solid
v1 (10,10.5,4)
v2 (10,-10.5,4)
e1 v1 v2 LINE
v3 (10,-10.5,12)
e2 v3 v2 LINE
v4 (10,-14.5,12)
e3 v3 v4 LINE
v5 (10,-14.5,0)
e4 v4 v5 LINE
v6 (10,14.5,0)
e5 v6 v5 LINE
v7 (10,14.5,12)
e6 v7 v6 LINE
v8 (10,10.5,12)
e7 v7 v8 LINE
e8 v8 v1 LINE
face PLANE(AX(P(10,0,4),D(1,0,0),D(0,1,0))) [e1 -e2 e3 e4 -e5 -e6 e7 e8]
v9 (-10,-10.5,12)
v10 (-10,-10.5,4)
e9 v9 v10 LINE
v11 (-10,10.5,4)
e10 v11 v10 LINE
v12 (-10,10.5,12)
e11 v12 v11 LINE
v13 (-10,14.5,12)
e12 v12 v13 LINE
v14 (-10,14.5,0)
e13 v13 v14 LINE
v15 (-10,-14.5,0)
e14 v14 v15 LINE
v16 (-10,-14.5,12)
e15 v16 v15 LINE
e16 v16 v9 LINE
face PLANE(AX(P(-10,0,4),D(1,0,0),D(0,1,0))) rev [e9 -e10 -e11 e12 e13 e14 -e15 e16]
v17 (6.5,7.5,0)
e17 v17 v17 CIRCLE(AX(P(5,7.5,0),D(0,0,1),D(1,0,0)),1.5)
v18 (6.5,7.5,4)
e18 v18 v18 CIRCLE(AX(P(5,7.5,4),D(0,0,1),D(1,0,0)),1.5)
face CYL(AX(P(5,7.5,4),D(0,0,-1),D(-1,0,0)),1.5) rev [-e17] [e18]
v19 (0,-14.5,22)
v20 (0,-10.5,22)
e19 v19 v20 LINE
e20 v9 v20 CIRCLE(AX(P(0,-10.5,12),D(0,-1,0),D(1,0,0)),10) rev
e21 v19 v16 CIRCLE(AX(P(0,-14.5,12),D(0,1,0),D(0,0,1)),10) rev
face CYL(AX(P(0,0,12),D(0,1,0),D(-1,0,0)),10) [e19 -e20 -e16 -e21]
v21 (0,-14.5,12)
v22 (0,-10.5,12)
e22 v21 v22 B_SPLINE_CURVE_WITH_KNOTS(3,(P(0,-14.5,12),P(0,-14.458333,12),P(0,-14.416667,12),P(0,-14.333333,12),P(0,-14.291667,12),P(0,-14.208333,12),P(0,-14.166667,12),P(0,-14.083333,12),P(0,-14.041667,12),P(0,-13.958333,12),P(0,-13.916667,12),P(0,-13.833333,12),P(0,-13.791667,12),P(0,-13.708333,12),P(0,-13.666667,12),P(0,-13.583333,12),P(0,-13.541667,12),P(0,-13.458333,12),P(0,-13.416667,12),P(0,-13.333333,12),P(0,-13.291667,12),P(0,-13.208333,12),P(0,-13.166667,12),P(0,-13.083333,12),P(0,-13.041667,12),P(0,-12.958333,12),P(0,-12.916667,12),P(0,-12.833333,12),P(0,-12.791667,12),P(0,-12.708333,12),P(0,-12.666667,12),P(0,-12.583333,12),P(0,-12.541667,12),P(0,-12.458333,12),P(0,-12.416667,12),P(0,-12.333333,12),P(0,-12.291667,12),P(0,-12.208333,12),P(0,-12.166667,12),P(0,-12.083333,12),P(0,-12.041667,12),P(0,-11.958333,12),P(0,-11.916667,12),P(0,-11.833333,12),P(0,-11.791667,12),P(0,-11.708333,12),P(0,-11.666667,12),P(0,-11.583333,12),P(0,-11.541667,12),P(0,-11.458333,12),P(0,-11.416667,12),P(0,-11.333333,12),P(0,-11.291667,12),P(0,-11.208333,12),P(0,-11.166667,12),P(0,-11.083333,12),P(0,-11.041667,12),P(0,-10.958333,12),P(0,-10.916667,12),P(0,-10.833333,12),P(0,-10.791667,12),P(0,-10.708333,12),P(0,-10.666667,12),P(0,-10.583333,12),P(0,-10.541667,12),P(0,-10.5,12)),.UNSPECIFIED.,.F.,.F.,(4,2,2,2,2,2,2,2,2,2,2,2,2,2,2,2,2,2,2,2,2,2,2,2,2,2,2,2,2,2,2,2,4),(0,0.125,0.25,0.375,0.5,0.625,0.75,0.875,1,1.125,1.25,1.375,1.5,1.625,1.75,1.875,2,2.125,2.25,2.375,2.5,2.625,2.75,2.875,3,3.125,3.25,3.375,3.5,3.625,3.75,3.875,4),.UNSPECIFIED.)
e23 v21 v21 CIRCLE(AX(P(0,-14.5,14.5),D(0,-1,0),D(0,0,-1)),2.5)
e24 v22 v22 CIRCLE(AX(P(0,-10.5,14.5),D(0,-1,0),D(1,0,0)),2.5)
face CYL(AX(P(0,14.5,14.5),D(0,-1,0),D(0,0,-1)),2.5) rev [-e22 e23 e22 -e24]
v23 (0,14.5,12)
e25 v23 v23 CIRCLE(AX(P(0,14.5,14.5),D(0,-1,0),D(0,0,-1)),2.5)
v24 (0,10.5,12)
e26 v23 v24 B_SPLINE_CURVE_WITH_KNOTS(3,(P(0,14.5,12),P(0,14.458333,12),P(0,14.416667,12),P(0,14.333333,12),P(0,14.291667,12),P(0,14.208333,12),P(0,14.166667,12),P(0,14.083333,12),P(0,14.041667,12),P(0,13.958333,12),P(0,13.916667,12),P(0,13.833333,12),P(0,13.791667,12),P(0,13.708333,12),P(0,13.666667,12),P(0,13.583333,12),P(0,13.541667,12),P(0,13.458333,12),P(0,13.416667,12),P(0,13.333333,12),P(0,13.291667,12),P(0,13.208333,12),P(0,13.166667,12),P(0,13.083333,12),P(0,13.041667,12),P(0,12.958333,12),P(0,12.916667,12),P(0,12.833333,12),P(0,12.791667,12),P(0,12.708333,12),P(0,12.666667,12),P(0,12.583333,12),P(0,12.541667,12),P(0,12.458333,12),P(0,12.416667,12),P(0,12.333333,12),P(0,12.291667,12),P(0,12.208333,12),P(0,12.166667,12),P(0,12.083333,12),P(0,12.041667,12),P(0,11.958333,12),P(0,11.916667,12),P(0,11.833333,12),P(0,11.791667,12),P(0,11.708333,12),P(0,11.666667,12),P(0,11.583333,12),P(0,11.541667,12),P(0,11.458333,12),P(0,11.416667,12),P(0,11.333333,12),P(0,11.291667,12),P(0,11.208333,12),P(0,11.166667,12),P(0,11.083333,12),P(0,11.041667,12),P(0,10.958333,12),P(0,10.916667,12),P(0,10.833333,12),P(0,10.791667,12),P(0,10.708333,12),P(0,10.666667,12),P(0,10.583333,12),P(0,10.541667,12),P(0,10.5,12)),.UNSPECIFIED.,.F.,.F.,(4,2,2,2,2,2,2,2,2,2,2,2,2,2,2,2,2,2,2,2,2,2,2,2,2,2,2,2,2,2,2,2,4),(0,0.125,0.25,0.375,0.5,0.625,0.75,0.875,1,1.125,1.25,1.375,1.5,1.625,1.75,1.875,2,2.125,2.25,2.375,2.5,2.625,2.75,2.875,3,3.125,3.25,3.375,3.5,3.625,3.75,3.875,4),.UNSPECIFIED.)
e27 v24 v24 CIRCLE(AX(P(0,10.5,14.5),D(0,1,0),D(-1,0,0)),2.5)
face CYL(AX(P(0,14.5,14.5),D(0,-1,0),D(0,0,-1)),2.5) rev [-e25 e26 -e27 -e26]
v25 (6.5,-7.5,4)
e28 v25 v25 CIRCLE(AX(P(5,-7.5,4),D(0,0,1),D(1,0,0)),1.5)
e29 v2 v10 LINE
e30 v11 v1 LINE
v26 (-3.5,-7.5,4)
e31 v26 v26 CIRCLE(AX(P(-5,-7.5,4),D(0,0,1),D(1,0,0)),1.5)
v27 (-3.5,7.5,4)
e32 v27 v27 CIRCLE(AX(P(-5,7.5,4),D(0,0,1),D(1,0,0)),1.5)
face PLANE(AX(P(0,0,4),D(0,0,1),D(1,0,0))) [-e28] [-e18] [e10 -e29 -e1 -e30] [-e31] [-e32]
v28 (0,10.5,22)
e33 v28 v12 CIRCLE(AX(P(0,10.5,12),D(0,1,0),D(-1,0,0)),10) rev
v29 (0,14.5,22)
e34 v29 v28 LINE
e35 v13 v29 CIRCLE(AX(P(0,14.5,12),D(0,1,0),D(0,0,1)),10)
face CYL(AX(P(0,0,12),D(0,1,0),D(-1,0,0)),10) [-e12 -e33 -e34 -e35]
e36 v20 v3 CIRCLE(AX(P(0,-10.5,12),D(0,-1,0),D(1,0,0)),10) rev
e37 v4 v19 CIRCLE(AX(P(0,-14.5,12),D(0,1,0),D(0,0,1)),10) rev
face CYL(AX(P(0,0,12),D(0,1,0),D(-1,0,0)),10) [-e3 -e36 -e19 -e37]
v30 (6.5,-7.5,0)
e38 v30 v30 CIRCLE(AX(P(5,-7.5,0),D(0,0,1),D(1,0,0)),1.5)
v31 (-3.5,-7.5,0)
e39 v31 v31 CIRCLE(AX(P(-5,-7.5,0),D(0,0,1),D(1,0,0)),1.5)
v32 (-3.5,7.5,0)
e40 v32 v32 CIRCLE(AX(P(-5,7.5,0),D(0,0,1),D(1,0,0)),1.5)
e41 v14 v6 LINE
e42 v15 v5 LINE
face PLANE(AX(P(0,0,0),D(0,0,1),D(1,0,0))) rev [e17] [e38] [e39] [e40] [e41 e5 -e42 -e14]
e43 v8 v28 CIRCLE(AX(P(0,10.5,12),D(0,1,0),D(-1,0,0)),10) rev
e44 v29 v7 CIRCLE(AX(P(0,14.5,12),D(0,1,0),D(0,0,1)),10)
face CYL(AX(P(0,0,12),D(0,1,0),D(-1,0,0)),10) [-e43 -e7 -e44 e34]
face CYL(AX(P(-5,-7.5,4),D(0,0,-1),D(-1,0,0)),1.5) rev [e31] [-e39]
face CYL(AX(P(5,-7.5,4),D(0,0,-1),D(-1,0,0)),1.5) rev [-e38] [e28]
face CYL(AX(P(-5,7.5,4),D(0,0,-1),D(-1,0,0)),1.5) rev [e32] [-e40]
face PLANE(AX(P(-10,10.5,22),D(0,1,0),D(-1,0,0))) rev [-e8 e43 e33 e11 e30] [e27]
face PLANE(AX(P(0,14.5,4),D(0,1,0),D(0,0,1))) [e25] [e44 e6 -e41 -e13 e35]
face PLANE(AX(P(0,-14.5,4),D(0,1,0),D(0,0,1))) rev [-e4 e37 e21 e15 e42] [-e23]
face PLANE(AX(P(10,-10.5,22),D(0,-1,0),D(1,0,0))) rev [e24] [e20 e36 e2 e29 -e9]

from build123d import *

# Parameters (mm, degrees)
SKETCH_1_W          = 20
SKETCH_1_H          = 29
SKETCH_1_R          = 1.5
EXTRUDE_1_DEPTH     = 4
SKETCH_2_W          = 20
SKETCH_2_H          = 4
EXTRUDE_2_DEPTH     = 18
CUT_EXTRUDE_1_DEPTH = 38.749172176
FILLET_1_R          = 10


with BuildPart() as part:
    # 草图1 → 凸台-拉伸1 (new body)
    with BuildSketch(Plane.XY):
        Rectangle(SKETCH_1_W, SKETCH_1_H)
        with Locations((5, 7.5)):
            Circle(SKETCH_1_R, mode=Mode.SUBTRACT)
        with Locations((-5, 7.5)):
            Circle(SKETCH_1_R, mode=Mode.SUBTRACT)
        with Locations((-5, -7.5)):
            Circle(SKETCH_1_R, mode=Mode.SUBTRACT)
        with Locations((5, -7.5)):
            Circle(SKETCH_1_R, mode=Mode.SUBTRACT)
    extrude(amount=EXTRUDE_1_DEPTH)

    # 草图2 → 凸台-拉伸2 (add)
    with BuildSketch(Plane.XY.offset(4)):
        with Locations((0, 12.5)):
            Rectangle(SKETCH_2_W, SKETCH_2_H)
        with Locations((0, -12.5)):
            Rectangle(SKETCH_2_W, SKETCH_2_H)
    extrude(amount=EXTRUDE_2_DEPTH)

    # 草图3 → 切除-拉伸1 (cut, through all)
    with BuildSketch(Plane.XZ.offset(14.5)):
        with BuildLine():
            ThreePointArc((2.5, 14.5), (0, 17), (-2.5, 14.5))
            Line((-2.5, 14.5), (2.5, 14.5))
        make_face()
        with BuildLine():
            Line((2.5, 14.5), (-2.5, 14.5))
            ThreePointArc((-2.5, 14.5), (0, 12), (2.5, 14.5))
        make_face()
    extrude(amount=-CUT_EXTRUDE_1_DEPTH, mode=Mode.SUBTRACT)

    # 圆角1
    fillet_1_edges = [part.edges().sort_by_distance(p)[0] for p in [
        (10, -12.5, 22),
        (10, 12.5, 22),
        (-10, 12.5, 22),
        (-10, -12.5, 22),
    ]]
    fillet(fillet_1_edges, radius=FILLET_1_R - 0.0001)  # a hair under: the kernel refuses the full size


solid = part.part
